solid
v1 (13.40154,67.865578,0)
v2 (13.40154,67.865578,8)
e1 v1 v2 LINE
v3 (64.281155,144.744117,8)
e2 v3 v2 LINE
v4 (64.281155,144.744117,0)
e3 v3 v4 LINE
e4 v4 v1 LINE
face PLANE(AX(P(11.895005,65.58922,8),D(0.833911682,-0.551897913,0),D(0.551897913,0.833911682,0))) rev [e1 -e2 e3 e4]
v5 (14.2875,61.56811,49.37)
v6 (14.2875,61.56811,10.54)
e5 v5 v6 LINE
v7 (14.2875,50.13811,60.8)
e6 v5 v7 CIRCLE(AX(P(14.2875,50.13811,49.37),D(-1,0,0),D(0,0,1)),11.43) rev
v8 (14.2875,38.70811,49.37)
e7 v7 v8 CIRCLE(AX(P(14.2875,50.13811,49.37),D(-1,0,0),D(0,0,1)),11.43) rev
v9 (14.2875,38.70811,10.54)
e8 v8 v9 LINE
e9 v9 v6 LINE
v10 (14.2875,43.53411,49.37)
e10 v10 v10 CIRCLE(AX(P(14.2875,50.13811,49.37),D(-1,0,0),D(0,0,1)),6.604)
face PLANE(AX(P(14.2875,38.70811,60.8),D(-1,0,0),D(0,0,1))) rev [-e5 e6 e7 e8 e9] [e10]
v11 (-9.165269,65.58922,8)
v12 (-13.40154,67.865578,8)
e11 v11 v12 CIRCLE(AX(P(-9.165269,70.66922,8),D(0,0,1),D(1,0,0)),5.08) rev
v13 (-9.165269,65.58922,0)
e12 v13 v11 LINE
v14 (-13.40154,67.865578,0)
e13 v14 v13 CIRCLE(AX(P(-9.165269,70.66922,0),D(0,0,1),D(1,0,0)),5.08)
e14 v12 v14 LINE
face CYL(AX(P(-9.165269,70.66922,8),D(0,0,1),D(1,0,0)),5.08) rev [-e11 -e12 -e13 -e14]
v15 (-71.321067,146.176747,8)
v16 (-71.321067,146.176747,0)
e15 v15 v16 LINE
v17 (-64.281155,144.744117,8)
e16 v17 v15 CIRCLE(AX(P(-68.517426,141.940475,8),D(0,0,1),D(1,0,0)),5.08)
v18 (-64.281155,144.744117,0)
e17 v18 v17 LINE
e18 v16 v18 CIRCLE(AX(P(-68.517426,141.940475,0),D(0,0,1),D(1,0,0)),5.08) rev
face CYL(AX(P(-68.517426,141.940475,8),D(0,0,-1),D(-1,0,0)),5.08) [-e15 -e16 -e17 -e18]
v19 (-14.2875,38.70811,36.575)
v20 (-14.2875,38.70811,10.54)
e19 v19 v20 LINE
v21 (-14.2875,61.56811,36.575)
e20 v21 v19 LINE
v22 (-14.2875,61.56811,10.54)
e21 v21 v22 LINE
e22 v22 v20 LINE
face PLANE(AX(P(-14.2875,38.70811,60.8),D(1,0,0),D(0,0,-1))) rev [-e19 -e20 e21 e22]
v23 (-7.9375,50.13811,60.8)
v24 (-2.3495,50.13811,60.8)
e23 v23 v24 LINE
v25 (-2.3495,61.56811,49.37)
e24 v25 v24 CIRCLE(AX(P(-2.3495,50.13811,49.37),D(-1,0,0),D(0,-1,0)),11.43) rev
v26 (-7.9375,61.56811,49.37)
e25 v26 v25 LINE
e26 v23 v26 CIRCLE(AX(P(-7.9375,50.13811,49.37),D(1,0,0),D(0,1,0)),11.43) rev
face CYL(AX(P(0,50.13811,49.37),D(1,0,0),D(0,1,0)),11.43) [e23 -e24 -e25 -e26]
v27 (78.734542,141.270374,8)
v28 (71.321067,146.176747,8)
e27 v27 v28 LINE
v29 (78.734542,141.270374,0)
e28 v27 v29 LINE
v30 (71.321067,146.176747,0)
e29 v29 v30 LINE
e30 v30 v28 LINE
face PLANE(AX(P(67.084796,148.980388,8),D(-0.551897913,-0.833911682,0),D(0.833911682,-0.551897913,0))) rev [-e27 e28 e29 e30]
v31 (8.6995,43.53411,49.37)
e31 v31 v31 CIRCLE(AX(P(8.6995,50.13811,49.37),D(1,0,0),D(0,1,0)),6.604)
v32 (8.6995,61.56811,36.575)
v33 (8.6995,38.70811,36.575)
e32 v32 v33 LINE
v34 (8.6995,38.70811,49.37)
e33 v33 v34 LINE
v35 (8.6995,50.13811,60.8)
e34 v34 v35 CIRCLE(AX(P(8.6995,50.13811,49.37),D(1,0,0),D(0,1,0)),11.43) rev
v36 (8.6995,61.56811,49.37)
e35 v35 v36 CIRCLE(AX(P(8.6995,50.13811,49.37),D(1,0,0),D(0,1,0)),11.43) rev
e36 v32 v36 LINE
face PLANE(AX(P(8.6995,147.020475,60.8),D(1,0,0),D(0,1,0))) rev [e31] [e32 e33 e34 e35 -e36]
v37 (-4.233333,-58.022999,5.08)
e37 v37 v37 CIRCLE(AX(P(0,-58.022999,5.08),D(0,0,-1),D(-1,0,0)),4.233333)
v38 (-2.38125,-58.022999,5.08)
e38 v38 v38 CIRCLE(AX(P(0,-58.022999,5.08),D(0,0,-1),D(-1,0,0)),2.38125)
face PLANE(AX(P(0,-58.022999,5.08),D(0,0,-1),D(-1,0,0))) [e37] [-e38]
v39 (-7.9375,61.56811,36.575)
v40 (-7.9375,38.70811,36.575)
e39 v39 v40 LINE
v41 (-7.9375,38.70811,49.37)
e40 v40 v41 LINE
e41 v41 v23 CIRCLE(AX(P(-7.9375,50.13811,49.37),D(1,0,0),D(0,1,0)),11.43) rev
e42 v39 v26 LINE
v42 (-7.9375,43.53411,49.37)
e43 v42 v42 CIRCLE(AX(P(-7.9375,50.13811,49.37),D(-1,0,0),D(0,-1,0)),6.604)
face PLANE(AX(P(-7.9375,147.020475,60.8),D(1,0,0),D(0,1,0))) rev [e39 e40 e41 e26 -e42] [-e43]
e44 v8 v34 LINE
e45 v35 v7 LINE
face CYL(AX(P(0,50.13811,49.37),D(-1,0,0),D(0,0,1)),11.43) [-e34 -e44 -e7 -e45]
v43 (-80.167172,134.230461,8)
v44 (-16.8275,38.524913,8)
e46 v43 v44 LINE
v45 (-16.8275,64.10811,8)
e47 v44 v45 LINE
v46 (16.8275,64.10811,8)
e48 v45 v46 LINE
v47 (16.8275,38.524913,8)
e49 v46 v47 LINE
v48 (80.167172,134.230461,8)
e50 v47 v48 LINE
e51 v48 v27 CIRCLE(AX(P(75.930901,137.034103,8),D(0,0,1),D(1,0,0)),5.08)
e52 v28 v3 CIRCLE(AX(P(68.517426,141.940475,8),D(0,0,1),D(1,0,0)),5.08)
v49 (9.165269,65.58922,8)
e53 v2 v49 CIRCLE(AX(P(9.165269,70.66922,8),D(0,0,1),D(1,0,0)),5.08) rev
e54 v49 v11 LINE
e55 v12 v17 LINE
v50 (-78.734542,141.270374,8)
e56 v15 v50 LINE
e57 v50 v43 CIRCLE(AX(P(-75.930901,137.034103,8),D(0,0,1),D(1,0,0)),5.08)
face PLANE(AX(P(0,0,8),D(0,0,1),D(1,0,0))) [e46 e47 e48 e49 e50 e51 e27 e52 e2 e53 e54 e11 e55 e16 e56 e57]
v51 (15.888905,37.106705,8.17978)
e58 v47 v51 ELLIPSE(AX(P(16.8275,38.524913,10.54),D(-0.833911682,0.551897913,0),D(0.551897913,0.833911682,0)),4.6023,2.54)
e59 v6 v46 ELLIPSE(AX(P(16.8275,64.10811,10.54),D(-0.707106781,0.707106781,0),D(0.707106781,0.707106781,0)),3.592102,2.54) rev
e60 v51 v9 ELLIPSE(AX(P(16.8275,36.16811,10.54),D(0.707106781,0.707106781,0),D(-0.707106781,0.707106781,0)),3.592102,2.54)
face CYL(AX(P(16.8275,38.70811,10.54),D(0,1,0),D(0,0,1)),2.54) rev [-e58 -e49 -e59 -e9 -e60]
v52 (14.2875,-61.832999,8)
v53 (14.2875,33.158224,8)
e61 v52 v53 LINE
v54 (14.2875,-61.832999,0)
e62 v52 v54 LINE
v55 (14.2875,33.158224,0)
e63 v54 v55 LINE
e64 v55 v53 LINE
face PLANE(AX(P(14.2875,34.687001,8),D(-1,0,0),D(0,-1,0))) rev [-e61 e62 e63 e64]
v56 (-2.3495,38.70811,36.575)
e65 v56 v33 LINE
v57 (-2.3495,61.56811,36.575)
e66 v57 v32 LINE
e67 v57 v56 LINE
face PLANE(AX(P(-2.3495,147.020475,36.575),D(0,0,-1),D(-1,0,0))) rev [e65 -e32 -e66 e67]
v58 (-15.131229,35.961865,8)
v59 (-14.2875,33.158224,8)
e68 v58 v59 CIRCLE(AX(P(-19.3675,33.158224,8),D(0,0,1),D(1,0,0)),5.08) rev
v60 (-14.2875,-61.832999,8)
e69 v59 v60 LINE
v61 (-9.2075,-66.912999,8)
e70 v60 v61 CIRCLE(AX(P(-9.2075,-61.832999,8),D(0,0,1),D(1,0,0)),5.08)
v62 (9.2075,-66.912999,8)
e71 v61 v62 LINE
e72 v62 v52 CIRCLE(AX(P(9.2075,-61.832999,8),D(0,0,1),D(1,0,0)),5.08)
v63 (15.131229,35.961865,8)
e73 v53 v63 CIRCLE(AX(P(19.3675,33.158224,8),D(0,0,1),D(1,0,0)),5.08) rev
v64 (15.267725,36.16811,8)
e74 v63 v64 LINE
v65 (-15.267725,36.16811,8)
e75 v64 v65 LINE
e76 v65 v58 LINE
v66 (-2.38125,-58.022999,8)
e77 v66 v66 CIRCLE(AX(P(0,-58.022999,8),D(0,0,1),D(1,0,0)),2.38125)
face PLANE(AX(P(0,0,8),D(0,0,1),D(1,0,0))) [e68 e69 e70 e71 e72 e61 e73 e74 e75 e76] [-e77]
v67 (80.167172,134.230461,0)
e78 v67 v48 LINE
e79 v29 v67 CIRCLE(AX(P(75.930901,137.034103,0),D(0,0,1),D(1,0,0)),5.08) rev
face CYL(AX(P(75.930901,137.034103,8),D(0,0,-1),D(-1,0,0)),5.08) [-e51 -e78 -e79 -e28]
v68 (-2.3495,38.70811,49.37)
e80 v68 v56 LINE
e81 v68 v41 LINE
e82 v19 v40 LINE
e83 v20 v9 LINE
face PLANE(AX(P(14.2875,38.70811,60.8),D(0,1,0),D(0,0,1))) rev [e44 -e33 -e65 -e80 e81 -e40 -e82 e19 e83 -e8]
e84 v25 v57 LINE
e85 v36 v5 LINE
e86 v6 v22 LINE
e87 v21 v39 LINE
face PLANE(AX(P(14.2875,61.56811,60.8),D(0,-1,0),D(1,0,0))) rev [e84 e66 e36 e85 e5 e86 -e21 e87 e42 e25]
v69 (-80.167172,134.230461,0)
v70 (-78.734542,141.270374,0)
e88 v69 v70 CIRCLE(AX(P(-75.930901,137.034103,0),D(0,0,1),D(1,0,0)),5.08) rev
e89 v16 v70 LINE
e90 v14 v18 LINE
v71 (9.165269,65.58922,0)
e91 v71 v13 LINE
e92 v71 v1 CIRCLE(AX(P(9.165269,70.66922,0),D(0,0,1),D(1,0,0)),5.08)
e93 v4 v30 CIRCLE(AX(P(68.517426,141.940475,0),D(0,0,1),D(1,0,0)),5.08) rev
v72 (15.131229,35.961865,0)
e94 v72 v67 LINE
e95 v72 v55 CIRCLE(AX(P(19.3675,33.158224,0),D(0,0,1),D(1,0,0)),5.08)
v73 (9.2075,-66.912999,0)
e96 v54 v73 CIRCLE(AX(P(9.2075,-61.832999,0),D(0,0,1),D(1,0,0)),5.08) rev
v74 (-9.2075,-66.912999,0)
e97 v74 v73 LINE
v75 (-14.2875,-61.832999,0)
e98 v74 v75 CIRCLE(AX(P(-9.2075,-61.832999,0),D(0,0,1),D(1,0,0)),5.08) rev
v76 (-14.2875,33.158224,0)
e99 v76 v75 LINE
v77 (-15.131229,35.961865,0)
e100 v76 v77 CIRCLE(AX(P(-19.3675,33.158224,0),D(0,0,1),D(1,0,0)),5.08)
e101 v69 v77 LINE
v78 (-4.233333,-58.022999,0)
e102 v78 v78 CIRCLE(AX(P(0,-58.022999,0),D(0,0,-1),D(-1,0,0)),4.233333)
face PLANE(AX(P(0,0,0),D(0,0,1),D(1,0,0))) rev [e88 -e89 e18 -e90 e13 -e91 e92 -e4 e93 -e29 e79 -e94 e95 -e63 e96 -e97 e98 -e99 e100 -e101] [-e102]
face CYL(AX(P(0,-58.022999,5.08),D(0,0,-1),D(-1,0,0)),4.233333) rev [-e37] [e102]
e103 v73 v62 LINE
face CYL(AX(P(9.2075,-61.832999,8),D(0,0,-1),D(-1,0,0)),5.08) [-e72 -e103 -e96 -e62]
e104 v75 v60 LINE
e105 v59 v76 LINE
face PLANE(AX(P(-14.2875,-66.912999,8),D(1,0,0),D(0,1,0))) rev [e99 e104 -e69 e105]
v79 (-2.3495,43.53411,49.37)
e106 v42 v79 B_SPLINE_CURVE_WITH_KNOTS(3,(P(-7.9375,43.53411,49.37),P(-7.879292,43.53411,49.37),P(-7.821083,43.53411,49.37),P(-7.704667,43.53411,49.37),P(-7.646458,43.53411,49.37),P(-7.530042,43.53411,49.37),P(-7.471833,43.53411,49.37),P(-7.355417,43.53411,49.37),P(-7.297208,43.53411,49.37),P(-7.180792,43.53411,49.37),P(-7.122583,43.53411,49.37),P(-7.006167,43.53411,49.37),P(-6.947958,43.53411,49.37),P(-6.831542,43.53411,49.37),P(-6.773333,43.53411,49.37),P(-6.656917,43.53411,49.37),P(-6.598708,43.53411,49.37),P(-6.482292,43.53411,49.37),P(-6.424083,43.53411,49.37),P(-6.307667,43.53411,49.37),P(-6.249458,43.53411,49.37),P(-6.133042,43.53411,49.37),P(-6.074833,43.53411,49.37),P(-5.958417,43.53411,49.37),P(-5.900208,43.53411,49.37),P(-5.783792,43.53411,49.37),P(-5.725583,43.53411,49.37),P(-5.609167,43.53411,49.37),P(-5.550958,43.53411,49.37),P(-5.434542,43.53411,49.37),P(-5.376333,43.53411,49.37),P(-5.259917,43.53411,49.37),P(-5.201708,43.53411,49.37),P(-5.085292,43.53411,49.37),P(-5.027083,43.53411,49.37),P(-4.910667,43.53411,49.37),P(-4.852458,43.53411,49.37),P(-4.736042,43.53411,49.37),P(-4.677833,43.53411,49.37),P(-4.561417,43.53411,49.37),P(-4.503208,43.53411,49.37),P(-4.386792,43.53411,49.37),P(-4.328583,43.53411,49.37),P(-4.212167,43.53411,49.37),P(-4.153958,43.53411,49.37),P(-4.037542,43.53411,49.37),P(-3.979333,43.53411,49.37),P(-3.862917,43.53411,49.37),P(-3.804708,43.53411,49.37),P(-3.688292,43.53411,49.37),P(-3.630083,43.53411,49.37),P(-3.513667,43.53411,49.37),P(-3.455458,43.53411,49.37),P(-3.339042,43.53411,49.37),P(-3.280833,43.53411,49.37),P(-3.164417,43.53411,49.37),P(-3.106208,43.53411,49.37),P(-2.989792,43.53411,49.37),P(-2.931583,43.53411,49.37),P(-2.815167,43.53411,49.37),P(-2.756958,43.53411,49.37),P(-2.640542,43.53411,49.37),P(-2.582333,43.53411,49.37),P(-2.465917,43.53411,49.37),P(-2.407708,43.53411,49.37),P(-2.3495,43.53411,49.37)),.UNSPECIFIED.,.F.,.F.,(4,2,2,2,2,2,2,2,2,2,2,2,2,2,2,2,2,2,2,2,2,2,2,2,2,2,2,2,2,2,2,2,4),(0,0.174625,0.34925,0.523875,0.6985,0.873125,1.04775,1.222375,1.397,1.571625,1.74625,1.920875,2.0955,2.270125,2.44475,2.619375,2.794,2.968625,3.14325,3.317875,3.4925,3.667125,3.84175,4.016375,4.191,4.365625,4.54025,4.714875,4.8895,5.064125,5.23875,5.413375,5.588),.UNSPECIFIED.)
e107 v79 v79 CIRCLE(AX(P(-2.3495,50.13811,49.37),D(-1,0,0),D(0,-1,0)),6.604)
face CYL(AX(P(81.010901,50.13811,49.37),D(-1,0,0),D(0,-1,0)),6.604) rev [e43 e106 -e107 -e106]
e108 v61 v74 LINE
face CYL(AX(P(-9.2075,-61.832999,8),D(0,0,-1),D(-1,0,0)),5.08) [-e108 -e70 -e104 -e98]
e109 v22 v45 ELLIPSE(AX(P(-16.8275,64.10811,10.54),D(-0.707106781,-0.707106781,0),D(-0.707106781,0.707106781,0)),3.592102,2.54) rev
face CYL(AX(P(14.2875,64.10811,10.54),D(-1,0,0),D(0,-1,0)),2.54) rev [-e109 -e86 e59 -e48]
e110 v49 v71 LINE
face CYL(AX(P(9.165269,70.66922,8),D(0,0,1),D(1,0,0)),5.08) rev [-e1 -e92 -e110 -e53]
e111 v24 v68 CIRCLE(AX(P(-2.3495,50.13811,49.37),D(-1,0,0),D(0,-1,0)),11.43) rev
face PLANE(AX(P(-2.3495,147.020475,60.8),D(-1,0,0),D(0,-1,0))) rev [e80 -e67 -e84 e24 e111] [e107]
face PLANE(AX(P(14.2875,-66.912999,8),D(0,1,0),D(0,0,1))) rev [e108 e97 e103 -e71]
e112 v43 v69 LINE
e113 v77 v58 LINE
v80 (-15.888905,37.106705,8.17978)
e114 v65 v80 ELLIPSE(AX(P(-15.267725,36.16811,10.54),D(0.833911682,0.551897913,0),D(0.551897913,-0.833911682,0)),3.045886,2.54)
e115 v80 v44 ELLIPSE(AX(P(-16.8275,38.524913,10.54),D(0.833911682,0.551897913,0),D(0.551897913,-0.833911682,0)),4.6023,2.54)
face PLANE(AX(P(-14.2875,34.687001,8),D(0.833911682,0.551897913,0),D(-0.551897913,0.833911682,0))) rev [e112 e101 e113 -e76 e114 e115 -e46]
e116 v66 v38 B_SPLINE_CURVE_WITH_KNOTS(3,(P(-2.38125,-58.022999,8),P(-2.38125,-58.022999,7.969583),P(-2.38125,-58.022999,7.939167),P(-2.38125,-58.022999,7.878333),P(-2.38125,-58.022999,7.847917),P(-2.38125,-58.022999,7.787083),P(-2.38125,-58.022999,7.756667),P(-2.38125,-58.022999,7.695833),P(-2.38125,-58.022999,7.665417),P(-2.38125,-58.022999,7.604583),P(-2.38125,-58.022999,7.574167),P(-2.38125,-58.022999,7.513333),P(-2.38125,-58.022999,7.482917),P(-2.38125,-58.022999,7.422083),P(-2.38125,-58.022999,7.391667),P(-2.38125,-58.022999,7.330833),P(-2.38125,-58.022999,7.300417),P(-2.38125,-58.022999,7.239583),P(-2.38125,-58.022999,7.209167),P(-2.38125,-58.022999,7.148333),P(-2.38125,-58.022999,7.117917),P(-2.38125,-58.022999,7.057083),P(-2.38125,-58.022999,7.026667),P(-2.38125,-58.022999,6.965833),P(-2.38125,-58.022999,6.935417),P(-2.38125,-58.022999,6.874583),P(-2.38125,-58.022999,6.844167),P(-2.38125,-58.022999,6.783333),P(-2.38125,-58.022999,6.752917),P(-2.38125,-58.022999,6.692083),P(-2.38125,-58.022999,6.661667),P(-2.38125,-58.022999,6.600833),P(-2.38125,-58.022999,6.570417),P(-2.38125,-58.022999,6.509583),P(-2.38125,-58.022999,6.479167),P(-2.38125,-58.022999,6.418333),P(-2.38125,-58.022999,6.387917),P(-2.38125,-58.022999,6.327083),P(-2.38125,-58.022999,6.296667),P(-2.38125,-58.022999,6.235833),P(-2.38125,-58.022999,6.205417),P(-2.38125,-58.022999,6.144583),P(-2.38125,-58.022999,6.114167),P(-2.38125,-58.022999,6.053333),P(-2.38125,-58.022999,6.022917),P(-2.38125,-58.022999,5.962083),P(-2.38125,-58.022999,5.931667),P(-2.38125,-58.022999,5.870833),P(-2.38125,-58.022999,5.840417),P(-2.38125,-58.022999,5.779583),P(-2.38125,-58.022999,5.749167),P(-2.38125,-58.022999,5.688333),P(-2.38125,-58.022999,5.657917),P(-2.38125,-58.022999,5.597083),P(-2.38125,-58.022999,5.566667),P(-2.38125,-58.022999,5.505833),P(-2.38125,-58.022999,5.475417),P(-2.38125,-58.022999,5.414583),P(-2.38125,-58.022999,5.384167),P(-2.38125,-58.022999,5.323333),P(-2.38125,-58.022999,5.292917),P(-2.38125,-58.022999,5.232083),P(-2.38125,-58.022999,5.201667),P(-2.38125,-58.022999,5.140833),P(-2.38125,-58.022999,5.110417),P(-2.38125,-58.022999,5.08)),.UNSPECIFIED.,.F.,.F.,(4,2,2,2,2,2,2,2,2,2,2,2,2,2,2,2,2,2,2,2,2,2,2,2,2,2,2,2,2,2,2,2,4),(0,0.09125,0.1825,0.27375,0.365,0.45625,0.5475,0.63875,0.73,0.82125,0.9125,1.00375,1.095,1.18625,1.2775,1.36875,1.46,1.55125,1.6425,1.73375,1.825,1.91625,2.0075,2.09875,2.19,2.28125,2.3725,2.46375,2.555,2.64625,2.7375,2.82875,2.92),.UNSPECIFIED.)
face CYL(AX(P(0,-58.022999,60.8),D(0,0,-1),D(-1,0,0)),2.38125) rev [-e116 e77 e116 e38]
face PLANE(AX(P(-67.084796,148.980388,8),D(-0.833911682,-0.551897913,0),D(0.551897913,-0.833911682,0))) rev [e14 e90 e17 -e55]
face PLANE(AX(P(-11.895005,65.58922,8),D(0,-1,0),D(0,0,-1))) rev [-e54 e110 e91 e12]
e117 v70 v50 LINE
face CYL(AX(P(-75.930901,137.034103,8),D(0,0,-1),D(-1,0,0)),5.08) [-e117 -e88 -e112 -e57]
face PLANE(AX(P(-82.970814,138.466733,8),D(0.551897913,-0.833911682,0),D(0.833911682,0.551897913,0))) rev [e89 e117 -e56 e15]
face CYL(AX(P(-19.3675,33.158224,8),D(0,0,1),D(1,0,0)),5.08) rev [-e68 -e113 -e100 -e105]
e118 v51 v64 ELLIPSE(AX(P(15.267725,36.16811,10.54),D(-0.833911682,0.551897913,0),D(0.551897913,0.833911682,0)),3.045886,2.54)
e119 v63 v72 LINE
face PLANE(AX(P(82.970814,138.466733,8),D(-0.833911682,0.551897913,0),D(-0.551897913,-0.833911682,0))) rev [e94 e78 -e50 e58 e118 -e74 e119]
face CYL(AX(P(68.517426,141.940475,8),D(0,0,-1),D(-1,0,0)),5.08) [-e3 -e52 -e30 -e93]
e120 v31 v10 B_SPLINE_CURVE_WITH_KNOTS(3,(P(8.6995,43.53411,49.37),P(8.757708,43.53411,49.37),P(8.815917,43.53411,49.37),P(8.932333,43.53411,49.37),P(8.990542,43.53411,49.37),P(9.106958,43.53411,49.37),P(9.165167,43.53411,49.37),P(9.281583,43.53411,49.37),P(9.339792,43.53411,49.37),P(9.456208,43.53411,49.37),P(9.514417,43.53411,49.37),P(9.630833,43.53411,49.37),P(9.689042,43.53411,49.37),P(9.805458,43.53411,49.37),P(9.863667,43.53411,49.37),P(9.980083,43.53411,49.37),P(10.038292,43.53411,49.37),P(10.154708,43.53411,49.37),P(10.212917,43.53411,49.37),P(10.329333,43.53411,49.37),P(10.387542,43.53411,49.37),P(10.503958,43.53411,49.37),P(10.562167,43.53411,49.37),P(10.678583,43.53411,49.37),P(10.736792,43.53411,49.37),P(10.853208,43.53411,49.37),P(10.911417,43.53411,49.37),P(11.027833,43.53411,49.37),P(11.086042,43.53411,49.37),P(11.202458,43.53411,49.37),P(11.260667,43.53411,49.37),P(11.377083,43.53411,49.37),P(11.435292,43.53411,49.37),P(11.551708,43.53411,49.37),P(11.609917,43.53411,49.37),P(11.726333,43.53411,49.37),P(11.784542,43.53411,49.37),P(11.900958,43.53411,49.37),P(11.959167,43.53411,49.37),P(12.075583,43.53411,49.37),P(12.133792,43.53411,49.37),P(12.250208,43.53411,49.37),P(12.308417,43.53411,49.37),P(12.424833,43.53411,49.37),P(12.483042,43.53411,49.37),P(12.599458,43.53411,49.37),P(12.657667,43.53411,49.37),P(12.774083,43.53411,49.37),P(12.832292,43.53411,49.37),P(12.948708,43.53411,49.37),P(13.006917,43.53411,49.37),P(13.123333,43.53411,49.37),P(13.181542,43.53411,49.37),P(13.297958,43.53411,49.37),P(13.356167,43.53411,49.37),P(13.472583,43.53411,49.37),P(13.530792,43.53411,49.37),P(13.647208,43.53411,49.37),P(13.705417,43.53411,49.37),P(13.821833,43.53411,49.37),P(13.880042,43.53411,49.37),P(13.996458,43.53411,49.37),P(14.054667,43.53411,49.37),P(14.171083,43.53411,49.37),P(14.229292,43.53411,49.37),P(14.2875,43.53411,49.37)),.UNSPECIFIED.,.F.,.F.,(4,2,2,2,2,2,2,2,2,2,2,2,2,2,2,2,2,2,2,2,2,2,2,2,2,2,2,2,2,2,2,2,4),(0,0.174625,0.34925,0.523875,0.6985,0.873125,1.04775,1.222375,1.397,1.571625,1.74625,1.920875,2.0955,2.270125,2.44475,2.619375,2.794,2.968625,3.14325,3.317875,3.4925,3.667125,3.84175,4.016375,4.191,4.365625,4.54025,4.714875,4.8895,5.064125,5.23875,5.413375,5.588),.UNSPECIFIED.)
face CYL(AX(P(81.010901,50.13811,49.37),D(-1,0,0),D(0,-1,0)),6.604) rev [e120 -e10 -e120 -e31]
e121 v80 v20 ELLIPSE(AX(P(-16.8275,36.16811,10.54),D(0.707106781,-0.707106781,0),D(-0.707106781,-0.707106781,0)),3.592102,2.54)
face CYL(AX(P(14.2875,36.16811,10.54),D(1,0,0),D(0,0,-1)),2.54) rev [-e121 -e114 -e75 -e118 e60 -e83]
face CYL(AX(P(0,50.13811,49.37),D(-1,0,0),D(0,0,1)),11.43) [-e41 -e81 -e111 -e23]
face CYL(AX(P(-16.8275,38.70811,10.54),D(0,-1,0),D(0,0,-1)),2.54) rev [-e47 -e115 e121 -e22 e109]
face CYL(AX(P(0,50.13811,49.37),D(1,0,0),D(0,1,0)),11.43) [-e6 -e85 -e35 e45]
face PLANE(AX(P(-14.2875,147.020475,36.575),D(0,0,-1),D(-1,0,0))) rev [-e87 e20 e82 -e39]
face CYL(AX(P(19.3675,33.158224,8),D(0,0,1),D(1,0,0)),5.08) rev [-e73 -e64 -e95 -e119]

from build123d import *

# Parameters (mm, degrees)
BOSS_EXTRUDE1_DEPTH = 8
SKETCH3_W           = 28.575
SKETCH3_H           = 22.86
BOSS_EXTRUDE2_DEPTH = 52.8
FILLET1_R           = 5.08
SKETCH4_W           = 6.35
SKETCH4_H           = 24.225
SKETCH4_W_2         = 11.049
CUT_EXTRUDE1_DEPTH  = 149.293541653
FILLET3_R           = 11.43
SKETCH5_R           = 6.604
CUT_EXTRUDE2_DEPTH  = 183.273086761
SKETCH7_R           = 4.233333333
CUT_EXTRUDE3_DEPTH  = 5.08
SKETCH8_R           = 2.38125
CUT_EXTRUDE4_DEPTH  = 177.868608292
FILLET7_R           = 2.54


# Some blends are built 0.0001 mm under size
with BuildPart() as part:
    # Sketch1 → Boss-Extrude1 (new body)
    with BuildSketch(Plane.XY):
        Polygon((-11.895004803, 65.589219752), (11.895004803, 65.589219752), (67.084796123, 148.980387954), (82.970813665, 138.466732708), (14.2875, 34.687000521), (14.2875, -66.912999479), (-14.2875, -66.912999479), (-14.2875, 34.687000521), (-82.970813665, 138.466732708), (-67.084796123, 148.980387954), align=None)
    extrude(amount=BOSS_EXTRUDE1_DEPTH)

    # Sketch3 → Boss-Extrude2 (add)
    with BuildSketch(Plane.XY.offset(8)):
        with Locations((0, 50.138110136)):
            Rectangle(SKETCH3_W, SKETCH3_H)
    extrude(amount=BOSS_EXTRUDE2_DEPTH)

    # Fillet1
    fillet1_edges = [part.edges().sort_by_distance(p)[0] for p in [
        (-11.895004803, 65.589219752, 4),
        (11.895004803, 65.589219752, 4),
        (67.084796123, 148.980387954, 4),
        (82.970813665, 138.466732708, 4),
        (14.2875, 34.687000521, 4),
        (14.2875, -66.912999479, 4),
        (-14.2875, -66.912999479, 4),
        (-14.2875, 34.687000521, 4),
        (-82.970813665, 138.466732708, 4),
        (-67.084796123, 148.980387954, 4),
    ]]
    fillet(fillet1_edges, radius=FILLET1_R)

    # Sketch4 → Cut-Extrude1 (cut, through all)
    with BuildSketch(Plane.XZ.offset(-38.708110136)):
        with Locations((-11.1125, 48.6875)):
            Rectangle(SKETCH4_W, SKETCH4_H)
        with Locations((3.175, 48.6875)):
            Rectangle(SKETCH4_W_2, SKETCH4_H)
    extrude(amount=-CUT_EXTRUDE1_DEPTH, mode=Mode.SUBTRACT)

    # Fillet3
    fillet3_edges = [part.edges().sort_by_distance(p)[0] for p in [
        (11.4935, 61.568110136, 60.8),
        (-5.1435, 61.568110136, 60.8),
        (11.4935, 38.708110136, 60.8),
        (-5.1435, 38.708110136, 60.8),
    ]]
    fillet(fillet3_edges, radius=FILLET3_R - 0.0001)  # a hair under: the kernel refuses the full size

    # Sketch5 → Cut-Extrude2 (cut, through all)
    with BuildSketch(Plane.ZY.offset(7.9375)):
        with Locations(Location((49.37, 50.138110136, 0), (0, 0, 270))):
            Circle(SKETCH5_R)
    extrude(amount=-CUT_EXTRUDE2_DEPTH, mode=Mode.SUBTRACT)

    # Sketch7 → Cut-Extrude3 (cut)
    with BuildSketch(Plane(origin=(0, 0, 0), x_dir=(-1, 0, 0), z_dir=(0, 0, -1))):
        with Locations((0, -58.022999479)):
            Circle(SKETCH7_R)
    extrude(amount=-CUT_EXTRUDE3_DEPTH, mode=Mode.SUBTRACT)

    # Sketch8 → Cut-Extrude4 (cut, through all)
    with BuildSketch(Plane(origin=(0, 0, 5.08), x_dir=(-1, 0, 0), z_dir=(0, 0, -1))):
        with Locations((0, -58.022999479)):
            Circle(SKETCH8_R)
    extrude(amount=-CUT_EXTRUDE4_DEPTH, mode=Mode.SUBTRACT)

    # Fillet7
    # the kernel refuses this fillet: 2.54 mm, written as the material it adds along each edge
    with BuildSketch(Plane(origin=(-14.2875, 38.708110136, 8), x_dir=(0, 0, 1), z_dir=(0, 1, 0))) as fillet7_piece_1:
        with BuildLine():
            CenterArc((FILLET7_R, -FILLET7_R), FILLET7_R, 90, 90)
            Line((0, -FILLET7_R), (0, 0))
            Line((0, 0), (FILLET7_R, 0))
        make_face()
    extrude(amount=22.86)
    with BuildSketch(Plane(origin=(14.2875, 38.708110136, 8), x_dir=(0, 0, 1), z_dir=(-1, 0, 0))) as fillet7_piece_2:
        with BuildLine():
            CenterArc((FILLET7_R, -FILLET7_R), FILLET7_R, 90, 90)
            Line((0, -FILLET7_R), (0, 0))
            Line((0, 0), (FILLET7_R, 0))
        make_face()
    extrude(amount=28.575)
    with BuildSketch(Plane(origin=(14.2875, 61.568110136, 8), x_dir=(1, 0, 0), z_dir=(0, -1, 0))) as fillet7_piece_3:
        with BuildLine():
            CenterArc((FILLET7_R, FILLET7_R), FILLET7_R, 180, 90)
            Line((0, FILLET7_R), (0, 0))
            Line((0, 0), (FILLET7_R, 0))
        make_face()
    extrude(amount=22.86)
    with BuildSketch(Plane(origin=(-14.2875, 61.568110136, 8), x_dir=(0, 1, 0), z_dir=(1, 0, 0))) as fillet7_piece_4:
        with BuildLine():
            CenterArc((FILLET7_R, FILLET7_R), FILLET7_R, 180, 90)
            Line((0, FILLET7_R), (0, 0))
            Line((0, 0), (FILLET7_R, 0))
        make_face()
    extrude(amount=28.575)
    with BuildSketch(Plane(origin=(14.2875, 38.708110136, 8), x_dir=(0, 0, 1), z_dir=(-1, 0, 0))) as fillet7_piece_5a_section:
        with BuildLine():
            CenterArc((FILLET7_R, -FILLET7_R), FILLET7_R, 90, 90)
            Line((0, -FILLET7_R), (0, 0))
            Line((0, 0), (FILLET7_R, 0))
        make_face()
    fillet7_piece_5a = extrude(amount=34.925, mode=Mode.PRIVATE)
    fillet7_piece_5a = split(fillet7_piece_5a, bisect_by=Plane(origin=(-14.2875, 38.220078421, 8.626447049), z_dir=(-1, 0, 0)), keep=Keep.TOP, mode=Mode.PRIVATE)
    fillet7_piece_5a = split(fillet7_piece_5a, bisect_by=Plane(origin=(-16.26964909, 37.682006014, 8.626447049), z_dir=(0.833911682022307, 0.5518979131929445, 0)), keep=Keep.TOP, mode=Mode.PRIVATE)
    with BuildSketch(Plane(origin=(-14.2875, 32.358110136, 8), x_dir=(0, 0, 1), z_dir=(0, 1, 0))) as fillet7_piece_5b_section:
        with BuildLine():
            CenterArc((FILLET7_R, -FILLET7_R), FILLET7_R, 90, 90)
            Line((0, -FILLET7_R), (0, 0))
            Line((0, 0), (FILLET7_R, 0))
        make_face()
    fillet7_piece_5b = extrude(amount=29.21, mode=Mode.PRIVATE)
    fillet7_piece_5b = split(fillet7_piece_5b, bisect_by=Plane(origin=(-14.718813993, 38.708110136, 8.659953821), z_dir=(0, -1, 0)), keep=Keep.TOP, mode=Mode.PRIVATE)
    fillet7_piece_5b = split(fillet7_piece_5b, bisect_by=Plane(origin=(-15.49417016, 36.510265873, 8.659953821), z_dir=(0.833911682022307, 0.5518979131929445, 0)), keep=Keep.TOP, mode=Mode.PRIVATE)
    fillet7_piece_5 = fillet7_piece_5a & fillet7_piece_5b
    add(fillet7_piece_5)
    with BuildSketch(Plane(origin=(-14.2875, 38.708110136, 8), x_dir=(0, 0, 1), z_dir=(0, 1, 0))) as fillet7_piece_6a_section:
        with BuildLine():
            CenterArc((FILLET7_R, -FILLET7_R), FILLET7_R, 90, 90)
            Line((0, -FILLET7_R), (0, 0))
            Line((0, 0), (FILLET7_R, 0))
        make_face()
    fillet7_piece_6a = extrude(amount=29.21, mode=Mode.PRIVATE)
    fillet7_piece_6a = split(fillet7_piece_6a, bisect_by=Plane(origin=(-14.86254359, 61.568110136, 8.57504359), z_dir=(0, 1, 0)), keep=Keep.TOP, mode=Mode.PRIVATE)
    with BuildSketch(Plane(origin=(-20.6375, 61.568110136, 8), x_dir=(0, 1, 0), z_dir=(1, 0, 0))) as fillet7_piece_6b_section:
        with BuildLine():
            CenterArc((FILLET7_R, FILLET7_R), FILLET7_R, 180, 90)
            Line((0, FILLET7_R), (0, 0))
            Line((0, 0), (FILLET7_R, 0))
        make_face()
    fillet7_piece_6b = extrude(amount=34.925, mode=Mode.PRIVATE)
    fillet7_piece_6b = split(fillet7_piece_6b, bisect_by=Plane(origin=(-14.2875, 62.143153727, 8.57504359), z_dir=(-1, 0, 0)), keep=Keep.TOP, mode=Mode.PRIVATE)
    fillet7_piece_6 = fillet7_piece_6a & fillet7_piece_6b
    add(fillet7_piece_6)
    with BuildSketch(Plane(origin=(20.6375, 38.708110136, 8), x_dir=(0, 0, 1), z_dir=(-1, 0, 0))) as fillet7_piece_7a_section:
        with BuildLine():
            CenterArc((FILLET7_R, -FILLET7_R), FILLET7_R, 90, 90)
            Line((0, -FILLET7_R), (0, 0))
            Line((0, 0), (FILLET7_R, 0))
        make_face()
    fillet7_piece_7a = extrude(amount=34.925, mode=Mode.PRIVATE)
    fillet7_piece_7a = split(fillet7_piece_7a, bisect_by=Plane(origin=(14.2875, 38.220078421, 8.626447049), z_dir=(1, 0, 0)), keep=Keep.TOP, mode=Mode.PRIVATE)
    fillet7_piece_7a = split(fillet7_piece_7a, bisect_by=Plane(origin=(16.26964909, 37.682006014, 8.626447049), z_dir=(-0.8339116820223075, 0.5518979131929438, 0)), keep=Keep.TOP, mode=Mode.PRIVATE)
    with BuildSketch(Plane(origin=(14.2875, 61.568110136, 8), x_dir=(1, 0, 0), z_dir=(0, -1, 0))) as fillet7_piece_7b_section:
        with BuildLine():
            CenterArc((FILLET7_R, FILLET7_R), FILLET7_R, 180, 90)
            Line((0, FILLET7_R), (0, 0))
            Line((0, 0), (FILLET7_R, 0))
        make_face()
    fillet7_piece_7b = extrude(amount=29.21, mode=Mode.PRIVATE)
    fillet7_piece_7b = split(fillet7_piece_7b, bisect_by=Plane(origin=(14.718813993, 38.708110136, 8.659953821), z_dir=(0, -1, 0)), keep=Keep.TOP, mode=Mode.PRIVATE)
    fillet7_piece_7b = split(fillet7_piece_7b, bisect_by=Plane(origin=(15.49417016, 36.510265872, 8.659953821), z_dir=(-0.8339116820223075, 0.5518979131929438, 0)), keep=Keep.TOP, mode=Mode.PRIVATE)
    fillet7_piece_7 = fillet7_piece_7a & fillet7_piece_7b
    add(fillet7_piece_7)
    with BuildSketch(Plane(origin=(14.2875, 67.918110136, 8), x_dir=(1, 0, 0), z_dir=(0, -1, 0))) as fillet7_piece_8a_section:
        with BuildLine():
            CenterArc((FILLET7_R, FILLET7_R), FILLET7_R, 180, 90)
            Line((0, FILLET7_R), (0, 0))
            Line((0, 0), (FILLET7_R, 0))
        make_face()
    fillet7_piece_8a = extrude(amount=29.21, mode=Mode.PRIVATE)
    fillet7_piece_8a = split(fillet7_piece_8a, bisect_by=Plane(origin=(14.86254359, 61.568110136, 8.57504359), z_dir=(0, 1, 0)), keep=Keep.TOP, mode=Mode.PRIVATE)
    with BuildSketch(Plane(origin=(-14.2875, 61.568110136, 8), x_dir=(0, 1, 0), z_dir=(1, 0, 0))) as fillet7_piece_8b_section:
        with BuildLine():
            CenterArc((FILLET7_R, FILLET7_R), FILLET7_R, 180, 90)
            Line((0, FILLET7_R), (0, 0))
            Line((0, 0), (FILLET7_R, 0))
        make_face()
    fillet7_piece_8b = extrude(amount=34.925, mode=Mode.PRIVATE)
    fillet7_piece_8b = split(fillet7_piece_8b, bisect_by=Plane(origin=(14.2875, 62.143153727, 8.57504359), z_dir=(1, 0, 0)), keep=Keep.TOP, mode=Mode.PRIVATE)
    fillet7_piece_8 = fillet7_piece_8a & fillet7_piece_8b
    add(fillet7_piece_8)


solid = part.part
